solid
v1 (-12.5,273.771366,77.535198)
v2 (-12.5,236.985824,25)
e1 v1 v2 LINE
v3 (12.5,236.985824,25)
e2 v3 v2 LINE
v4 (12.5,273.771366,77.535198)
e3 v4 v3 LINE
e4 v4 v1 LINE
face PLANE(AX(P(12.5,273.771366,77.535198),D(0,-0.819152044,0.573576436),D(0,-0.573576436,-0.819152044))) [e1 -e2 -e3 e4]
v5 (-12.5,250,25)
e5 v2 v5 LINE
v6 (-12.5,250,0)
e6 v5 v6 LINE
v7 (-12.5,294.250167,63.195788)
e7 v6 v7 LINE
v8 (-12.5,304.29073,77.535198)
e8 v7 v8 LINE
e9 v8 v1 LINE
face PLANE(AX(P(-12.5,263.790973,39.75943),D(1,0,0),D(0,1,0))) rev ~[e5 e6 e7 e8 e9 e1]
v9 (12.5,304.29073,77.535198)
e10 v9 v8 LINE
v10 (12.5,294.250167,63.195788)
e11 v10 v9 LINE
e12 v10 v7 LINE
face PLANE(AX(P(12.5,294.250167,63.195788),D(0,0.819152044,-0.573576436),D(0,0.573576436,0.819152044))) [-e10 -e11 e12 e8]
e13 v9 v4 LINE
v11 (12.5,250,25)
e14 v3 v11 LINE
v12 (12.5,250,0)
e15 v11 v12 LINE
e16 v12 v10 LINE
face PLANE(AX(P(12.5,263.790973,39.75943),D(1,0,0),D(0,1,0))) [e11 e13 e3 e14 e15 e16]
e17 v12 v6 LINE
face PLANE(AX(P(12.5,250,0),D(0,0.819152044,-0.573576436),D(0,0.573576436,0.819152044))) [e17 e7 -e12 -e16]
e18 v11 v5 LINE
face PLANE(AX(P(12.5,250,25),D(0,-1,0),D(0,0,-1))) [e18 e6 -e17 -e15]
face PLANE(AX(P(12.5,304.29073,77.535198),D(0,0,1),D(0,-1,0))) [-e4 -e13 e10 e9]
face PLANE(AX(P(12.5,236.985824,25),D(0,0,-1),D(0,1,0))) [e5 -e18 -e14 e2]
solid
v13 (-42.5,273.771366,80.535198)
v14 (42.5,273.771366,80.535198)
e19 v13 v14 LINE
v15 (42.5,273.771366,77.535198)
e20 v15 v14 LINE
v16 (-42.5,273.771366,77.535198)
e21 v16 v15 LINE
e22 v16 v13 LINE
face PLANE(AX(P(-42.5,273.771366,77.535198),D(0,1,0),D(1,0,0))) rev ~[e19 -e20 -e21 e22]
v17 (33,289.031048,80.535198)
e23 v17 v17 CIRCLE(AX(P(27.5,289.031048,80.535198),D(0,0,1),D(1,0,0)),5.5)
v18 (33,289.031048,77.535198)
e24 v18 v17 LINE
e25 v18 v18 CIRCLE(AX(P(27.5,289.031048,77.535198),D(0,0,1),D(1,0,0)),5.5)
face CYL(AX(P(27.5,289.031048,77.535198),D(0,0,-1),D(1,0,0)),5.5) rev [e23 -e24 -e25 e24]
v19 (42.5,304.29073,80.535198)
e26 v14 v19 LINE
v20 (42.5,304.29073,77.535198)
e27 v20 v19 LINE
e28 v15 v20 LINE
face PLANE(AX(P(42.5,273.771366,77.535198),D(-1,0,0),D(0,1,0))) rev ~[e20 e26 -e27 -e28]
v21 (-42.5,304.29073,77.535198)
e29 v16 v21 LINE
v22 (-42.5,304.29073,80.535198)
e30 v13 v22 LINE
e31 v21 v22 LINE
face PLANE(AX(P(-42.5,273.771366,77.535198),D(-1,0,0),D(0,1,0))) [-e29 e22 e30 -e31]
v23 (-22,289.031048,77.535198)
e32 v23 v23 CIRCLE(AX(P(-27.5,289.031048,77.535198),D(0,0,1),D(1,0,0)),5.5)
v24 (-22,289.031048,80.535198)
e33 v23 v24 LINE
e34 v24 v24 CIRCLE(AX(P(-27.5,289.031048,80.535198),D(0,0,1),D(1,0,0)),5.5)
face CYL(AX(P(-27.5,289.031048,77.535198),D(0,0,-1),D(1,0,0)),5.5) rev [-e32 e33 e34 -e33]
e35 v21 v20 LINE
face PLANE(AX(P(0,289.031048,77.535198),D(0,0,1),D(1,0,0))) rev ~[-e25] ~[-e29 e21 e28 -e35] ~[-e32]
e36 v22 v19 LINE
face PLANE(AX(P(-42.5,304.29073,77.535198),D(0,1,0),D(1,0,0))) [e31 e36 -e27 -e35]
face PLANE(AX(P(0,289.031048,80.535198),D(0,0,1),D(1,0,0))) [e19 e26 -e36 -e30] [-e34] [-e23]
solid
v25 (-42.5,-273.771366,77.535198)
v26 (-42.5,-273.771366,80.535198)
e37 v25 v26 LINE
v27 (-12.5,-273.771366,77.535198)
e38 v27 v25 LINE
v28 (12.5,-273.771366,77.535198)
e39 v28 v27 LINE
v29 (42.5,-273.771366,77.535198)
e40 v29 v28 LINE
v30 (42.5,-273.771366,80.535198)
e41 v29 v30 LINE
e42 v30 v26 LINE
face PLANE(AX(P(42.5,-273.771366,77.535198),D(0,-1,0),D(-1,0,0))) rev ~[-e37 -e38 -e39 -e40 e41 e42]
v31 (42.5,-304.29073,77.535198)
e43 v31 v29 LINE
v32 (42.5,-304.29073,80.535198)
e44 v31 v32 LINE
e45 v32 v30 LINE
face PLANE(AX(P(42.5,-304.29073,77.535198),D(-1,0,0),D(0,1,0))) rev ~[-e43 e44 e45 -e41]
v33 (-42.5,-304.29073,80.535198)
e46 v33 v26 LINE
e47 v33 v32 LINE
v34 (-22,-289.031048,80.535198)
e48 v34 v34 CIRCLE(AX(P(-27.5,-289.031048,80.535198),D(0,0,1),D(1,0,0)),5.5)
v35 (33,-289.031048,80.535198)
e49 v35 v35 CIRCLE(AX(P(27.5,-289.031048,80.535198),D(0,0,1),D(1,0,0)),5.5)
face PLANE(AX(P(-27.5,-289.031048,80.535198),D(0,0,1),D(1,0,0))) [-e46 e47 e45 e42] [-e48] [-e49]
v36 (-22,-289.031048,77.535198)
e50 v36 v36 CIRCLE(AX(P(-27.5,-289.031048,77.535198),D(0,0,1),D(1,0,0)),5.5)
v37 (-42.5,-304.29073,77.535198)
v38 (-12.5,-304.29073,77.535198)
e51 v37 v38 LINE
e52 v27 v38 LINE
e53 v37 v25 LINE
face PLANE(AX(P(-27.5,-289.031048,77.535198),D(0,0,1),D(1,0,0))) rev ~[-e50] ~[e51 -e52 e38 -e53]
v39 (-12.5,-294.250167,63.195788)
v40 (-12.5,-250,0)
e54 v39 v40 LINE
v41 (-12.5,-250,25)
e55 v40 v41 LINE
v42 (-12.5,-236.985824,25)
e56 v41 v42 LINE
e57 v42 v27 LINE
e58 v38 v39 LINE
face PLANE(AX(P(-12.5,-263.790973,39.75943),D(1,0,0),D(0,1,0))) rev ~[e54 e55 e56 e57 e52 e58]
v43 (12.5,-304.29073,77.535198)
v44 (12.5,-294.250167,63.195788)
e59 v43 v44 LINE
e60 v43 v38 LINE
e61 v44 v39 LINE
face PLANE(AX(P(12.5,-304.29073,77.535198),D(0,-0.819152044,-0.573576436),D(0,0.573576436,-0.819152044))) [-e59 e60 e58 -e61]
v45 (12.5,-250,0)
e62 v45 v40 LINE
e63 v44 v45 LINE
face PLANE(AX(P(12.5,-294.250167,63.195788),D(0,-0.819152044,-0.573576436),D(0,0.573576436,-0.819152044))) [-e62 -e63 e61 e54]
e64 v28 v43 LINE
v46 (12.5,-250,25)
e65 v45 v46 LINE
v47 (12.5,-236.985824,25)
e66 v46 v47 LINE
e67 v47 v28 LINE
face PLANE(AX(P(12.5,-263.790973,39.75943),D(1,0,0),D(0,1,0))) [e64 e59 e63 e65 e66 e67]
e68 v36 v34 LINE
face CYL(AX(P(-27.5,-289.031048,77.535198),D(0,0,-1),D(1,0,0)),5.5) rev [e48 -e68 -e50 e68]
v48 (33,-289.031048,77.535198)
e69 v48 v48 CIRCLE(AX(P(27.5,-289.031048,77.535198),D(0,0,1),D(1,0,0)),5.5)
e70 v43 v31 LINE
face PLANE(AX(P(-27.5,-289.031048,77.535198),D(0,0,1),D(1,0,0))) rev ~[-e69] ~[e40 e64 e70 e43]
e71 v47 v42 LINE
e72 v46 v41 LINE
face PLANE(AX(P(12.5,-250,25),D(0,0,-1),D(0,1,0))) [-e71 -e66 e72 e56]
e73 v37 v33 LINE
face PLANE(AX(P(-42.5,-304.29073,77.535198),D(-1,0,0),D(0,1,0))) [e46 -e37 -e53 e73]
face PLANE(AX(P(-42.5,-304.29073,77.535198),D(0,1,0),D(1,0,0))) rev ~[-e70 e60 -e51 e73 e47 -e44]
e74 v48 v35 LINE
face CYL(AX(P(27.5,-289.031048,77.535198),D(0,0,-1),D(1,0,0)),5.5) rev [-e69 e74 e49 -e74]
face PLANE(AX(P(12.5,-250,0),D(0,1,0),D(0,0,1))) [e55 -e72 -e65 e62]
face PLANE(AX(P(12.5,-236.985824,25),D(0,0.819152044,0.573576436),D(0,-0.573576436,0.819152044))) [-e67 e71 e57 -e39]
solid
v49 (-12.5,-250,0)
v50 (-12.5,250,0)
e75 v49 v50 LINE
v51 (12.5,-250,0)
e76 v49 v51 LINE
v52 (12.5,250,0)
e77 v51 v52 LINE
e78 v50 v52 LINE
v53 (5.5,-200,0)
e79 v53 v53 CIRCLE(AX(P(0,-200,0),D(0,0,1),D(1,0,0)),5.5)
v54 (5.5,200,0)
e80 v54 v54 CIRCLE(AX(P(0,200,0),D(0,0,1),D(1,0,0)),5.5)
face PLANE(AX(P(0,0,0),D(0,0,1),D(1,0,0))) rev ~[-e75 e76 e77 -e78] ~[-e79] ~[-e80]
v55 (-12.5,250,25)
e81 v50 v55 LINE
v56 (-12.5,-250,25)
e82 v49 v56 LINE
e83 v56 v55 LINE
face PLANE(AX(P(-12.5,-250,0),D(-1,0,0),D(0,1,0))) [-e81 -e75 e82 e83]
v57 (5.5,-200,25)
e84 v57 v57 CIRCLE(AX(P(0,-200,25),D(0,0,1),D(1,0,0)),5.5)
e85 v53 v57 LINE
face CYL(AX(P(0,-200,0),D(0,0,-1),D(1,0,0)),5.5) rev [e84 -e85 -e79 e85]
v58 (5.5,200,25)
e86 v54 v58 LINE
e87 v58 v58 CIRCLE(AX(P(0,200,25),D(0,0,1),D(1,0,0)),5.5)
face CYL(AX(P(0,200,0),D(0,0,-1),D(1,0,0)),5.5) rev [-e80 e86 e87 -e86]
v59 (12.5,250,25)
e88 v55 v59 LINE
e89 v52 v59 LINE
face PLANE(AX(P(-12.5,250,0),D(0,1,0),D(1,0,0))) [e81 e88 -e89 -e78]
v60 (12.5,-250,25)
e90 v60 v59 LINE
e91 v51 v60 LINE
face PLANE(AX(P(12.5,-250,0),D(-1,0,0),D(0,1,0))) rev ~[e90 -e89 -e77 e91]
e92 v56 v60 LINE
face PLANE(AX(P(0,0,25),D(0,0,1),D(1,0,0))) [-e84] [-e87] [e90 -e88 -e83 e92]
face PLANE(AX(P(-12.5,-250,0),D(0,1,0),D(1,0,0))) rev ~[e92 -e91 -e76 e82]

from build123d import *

# Parameters (mm, degrees)
F0_W     = 25
F0_H     = 500
F0_R     = 5.5
F1_DEPTH = 25
F3_DEPTH = 25
F4_W     = 30
F4_H     = 30.519364719
F4_R     = 5.5
F4_W_2   = 25
F5_DEPTH = 3
F4_W_3   = 85


# Not quite as in the source:
# - a feature names something its author has since deleted; it is built from what else it names


with BuildPart() as f1:
    # F0 (on Top) → F1 (new body)
    with BuildSketch(Plane.XY):
        Rectangle(F0_W, F0_H)
        with Locations((0, -200)):
            Circle(F0_R, mode=Mode.SUBTRACT)
        with Locations((0, 200)):
            Circle(F0_R, mode=Mode.SUBTRACT)
    extrude(amount=F1_DEPTH)


with BuildPart() as f3:
    # F2 (on face) → F3 (new body)
    with BuildSketch(Plane.YZ.offset(12.5)):
        Polygon((-294.2501667927, 63.1957875029), (-250, 0), (-250, 25), (-236.9858237362, 25), (-273.7713656854, 77.5351984117), align=None)
        Polygon((-304.2907304045, 77.5351984117), (-294.2501667927, 63.1957875029), (-273.7713656854, 77.5351984117), align=None)
    extrude(amount=-F3_DEPTH)

    # F4 (on face) → F5 (join)
    with BuildSketch(Plane.XY.offset(77.5351984117)):
        with Locations((-27.5, -289.0310480449)):
            Rectangle(F4_W, F4_H)
        with Locations((-27.5, -289.0310480449)):
            Circle(F4_R, mode=Mode.SUBTRACT)
        with Locations((0, -289.0310480449)):
            Rectangle(F4_W_2, F4_H)
        with Locations((27.5, -289.0310480449)):
            Rectangle(F4_W, F4_H)
        with Locations((27.5, -289.0310480449)):
            Circle(F4_R, mode=Mode.SUBTRACT)
    extrude(amount=F5_DEPTH)


with BuildPart() as f3b:
    # F2 (on face) → F3, piece 2 (new body)
    with BuildSketch(Plane.YZ.offset(12.5)):
        Polygon((250, 25), (250, 0), (294.2501667927, 63.1957875029), (273.7713656854, 77.5351984117), (236.9858237362, 25), align=None)
        Polygon((273.7713656854, 77.5351984117), (294.2501667927, 63.1957875029), (304.2907304045, 77.5351984117), align=None)
    extrude(amount=-F3_DEPTH)


with BuildPart() as f5:
    # F4 (on face) → F5, piece 2 (new body)
    with BuildSketch(Plane.XY.offset(77.5351984117)):
        with Locations((0, 289.0310480449)):
            Rectangle(F4_W_3, F4_H)
        with Locations((-27.5, 289.0310480449)):
            Circle(F4_R, mode=Mode.SUBTRACT)
        with Locations((27.5, 289.0310480449)):
            Circle(F4_R, mode=Mode.SUBTRACT)
    extrude(amount=F5_DEPTH)


solid = Compound([f1.part, f3.part, f3b.part, f5.part])
